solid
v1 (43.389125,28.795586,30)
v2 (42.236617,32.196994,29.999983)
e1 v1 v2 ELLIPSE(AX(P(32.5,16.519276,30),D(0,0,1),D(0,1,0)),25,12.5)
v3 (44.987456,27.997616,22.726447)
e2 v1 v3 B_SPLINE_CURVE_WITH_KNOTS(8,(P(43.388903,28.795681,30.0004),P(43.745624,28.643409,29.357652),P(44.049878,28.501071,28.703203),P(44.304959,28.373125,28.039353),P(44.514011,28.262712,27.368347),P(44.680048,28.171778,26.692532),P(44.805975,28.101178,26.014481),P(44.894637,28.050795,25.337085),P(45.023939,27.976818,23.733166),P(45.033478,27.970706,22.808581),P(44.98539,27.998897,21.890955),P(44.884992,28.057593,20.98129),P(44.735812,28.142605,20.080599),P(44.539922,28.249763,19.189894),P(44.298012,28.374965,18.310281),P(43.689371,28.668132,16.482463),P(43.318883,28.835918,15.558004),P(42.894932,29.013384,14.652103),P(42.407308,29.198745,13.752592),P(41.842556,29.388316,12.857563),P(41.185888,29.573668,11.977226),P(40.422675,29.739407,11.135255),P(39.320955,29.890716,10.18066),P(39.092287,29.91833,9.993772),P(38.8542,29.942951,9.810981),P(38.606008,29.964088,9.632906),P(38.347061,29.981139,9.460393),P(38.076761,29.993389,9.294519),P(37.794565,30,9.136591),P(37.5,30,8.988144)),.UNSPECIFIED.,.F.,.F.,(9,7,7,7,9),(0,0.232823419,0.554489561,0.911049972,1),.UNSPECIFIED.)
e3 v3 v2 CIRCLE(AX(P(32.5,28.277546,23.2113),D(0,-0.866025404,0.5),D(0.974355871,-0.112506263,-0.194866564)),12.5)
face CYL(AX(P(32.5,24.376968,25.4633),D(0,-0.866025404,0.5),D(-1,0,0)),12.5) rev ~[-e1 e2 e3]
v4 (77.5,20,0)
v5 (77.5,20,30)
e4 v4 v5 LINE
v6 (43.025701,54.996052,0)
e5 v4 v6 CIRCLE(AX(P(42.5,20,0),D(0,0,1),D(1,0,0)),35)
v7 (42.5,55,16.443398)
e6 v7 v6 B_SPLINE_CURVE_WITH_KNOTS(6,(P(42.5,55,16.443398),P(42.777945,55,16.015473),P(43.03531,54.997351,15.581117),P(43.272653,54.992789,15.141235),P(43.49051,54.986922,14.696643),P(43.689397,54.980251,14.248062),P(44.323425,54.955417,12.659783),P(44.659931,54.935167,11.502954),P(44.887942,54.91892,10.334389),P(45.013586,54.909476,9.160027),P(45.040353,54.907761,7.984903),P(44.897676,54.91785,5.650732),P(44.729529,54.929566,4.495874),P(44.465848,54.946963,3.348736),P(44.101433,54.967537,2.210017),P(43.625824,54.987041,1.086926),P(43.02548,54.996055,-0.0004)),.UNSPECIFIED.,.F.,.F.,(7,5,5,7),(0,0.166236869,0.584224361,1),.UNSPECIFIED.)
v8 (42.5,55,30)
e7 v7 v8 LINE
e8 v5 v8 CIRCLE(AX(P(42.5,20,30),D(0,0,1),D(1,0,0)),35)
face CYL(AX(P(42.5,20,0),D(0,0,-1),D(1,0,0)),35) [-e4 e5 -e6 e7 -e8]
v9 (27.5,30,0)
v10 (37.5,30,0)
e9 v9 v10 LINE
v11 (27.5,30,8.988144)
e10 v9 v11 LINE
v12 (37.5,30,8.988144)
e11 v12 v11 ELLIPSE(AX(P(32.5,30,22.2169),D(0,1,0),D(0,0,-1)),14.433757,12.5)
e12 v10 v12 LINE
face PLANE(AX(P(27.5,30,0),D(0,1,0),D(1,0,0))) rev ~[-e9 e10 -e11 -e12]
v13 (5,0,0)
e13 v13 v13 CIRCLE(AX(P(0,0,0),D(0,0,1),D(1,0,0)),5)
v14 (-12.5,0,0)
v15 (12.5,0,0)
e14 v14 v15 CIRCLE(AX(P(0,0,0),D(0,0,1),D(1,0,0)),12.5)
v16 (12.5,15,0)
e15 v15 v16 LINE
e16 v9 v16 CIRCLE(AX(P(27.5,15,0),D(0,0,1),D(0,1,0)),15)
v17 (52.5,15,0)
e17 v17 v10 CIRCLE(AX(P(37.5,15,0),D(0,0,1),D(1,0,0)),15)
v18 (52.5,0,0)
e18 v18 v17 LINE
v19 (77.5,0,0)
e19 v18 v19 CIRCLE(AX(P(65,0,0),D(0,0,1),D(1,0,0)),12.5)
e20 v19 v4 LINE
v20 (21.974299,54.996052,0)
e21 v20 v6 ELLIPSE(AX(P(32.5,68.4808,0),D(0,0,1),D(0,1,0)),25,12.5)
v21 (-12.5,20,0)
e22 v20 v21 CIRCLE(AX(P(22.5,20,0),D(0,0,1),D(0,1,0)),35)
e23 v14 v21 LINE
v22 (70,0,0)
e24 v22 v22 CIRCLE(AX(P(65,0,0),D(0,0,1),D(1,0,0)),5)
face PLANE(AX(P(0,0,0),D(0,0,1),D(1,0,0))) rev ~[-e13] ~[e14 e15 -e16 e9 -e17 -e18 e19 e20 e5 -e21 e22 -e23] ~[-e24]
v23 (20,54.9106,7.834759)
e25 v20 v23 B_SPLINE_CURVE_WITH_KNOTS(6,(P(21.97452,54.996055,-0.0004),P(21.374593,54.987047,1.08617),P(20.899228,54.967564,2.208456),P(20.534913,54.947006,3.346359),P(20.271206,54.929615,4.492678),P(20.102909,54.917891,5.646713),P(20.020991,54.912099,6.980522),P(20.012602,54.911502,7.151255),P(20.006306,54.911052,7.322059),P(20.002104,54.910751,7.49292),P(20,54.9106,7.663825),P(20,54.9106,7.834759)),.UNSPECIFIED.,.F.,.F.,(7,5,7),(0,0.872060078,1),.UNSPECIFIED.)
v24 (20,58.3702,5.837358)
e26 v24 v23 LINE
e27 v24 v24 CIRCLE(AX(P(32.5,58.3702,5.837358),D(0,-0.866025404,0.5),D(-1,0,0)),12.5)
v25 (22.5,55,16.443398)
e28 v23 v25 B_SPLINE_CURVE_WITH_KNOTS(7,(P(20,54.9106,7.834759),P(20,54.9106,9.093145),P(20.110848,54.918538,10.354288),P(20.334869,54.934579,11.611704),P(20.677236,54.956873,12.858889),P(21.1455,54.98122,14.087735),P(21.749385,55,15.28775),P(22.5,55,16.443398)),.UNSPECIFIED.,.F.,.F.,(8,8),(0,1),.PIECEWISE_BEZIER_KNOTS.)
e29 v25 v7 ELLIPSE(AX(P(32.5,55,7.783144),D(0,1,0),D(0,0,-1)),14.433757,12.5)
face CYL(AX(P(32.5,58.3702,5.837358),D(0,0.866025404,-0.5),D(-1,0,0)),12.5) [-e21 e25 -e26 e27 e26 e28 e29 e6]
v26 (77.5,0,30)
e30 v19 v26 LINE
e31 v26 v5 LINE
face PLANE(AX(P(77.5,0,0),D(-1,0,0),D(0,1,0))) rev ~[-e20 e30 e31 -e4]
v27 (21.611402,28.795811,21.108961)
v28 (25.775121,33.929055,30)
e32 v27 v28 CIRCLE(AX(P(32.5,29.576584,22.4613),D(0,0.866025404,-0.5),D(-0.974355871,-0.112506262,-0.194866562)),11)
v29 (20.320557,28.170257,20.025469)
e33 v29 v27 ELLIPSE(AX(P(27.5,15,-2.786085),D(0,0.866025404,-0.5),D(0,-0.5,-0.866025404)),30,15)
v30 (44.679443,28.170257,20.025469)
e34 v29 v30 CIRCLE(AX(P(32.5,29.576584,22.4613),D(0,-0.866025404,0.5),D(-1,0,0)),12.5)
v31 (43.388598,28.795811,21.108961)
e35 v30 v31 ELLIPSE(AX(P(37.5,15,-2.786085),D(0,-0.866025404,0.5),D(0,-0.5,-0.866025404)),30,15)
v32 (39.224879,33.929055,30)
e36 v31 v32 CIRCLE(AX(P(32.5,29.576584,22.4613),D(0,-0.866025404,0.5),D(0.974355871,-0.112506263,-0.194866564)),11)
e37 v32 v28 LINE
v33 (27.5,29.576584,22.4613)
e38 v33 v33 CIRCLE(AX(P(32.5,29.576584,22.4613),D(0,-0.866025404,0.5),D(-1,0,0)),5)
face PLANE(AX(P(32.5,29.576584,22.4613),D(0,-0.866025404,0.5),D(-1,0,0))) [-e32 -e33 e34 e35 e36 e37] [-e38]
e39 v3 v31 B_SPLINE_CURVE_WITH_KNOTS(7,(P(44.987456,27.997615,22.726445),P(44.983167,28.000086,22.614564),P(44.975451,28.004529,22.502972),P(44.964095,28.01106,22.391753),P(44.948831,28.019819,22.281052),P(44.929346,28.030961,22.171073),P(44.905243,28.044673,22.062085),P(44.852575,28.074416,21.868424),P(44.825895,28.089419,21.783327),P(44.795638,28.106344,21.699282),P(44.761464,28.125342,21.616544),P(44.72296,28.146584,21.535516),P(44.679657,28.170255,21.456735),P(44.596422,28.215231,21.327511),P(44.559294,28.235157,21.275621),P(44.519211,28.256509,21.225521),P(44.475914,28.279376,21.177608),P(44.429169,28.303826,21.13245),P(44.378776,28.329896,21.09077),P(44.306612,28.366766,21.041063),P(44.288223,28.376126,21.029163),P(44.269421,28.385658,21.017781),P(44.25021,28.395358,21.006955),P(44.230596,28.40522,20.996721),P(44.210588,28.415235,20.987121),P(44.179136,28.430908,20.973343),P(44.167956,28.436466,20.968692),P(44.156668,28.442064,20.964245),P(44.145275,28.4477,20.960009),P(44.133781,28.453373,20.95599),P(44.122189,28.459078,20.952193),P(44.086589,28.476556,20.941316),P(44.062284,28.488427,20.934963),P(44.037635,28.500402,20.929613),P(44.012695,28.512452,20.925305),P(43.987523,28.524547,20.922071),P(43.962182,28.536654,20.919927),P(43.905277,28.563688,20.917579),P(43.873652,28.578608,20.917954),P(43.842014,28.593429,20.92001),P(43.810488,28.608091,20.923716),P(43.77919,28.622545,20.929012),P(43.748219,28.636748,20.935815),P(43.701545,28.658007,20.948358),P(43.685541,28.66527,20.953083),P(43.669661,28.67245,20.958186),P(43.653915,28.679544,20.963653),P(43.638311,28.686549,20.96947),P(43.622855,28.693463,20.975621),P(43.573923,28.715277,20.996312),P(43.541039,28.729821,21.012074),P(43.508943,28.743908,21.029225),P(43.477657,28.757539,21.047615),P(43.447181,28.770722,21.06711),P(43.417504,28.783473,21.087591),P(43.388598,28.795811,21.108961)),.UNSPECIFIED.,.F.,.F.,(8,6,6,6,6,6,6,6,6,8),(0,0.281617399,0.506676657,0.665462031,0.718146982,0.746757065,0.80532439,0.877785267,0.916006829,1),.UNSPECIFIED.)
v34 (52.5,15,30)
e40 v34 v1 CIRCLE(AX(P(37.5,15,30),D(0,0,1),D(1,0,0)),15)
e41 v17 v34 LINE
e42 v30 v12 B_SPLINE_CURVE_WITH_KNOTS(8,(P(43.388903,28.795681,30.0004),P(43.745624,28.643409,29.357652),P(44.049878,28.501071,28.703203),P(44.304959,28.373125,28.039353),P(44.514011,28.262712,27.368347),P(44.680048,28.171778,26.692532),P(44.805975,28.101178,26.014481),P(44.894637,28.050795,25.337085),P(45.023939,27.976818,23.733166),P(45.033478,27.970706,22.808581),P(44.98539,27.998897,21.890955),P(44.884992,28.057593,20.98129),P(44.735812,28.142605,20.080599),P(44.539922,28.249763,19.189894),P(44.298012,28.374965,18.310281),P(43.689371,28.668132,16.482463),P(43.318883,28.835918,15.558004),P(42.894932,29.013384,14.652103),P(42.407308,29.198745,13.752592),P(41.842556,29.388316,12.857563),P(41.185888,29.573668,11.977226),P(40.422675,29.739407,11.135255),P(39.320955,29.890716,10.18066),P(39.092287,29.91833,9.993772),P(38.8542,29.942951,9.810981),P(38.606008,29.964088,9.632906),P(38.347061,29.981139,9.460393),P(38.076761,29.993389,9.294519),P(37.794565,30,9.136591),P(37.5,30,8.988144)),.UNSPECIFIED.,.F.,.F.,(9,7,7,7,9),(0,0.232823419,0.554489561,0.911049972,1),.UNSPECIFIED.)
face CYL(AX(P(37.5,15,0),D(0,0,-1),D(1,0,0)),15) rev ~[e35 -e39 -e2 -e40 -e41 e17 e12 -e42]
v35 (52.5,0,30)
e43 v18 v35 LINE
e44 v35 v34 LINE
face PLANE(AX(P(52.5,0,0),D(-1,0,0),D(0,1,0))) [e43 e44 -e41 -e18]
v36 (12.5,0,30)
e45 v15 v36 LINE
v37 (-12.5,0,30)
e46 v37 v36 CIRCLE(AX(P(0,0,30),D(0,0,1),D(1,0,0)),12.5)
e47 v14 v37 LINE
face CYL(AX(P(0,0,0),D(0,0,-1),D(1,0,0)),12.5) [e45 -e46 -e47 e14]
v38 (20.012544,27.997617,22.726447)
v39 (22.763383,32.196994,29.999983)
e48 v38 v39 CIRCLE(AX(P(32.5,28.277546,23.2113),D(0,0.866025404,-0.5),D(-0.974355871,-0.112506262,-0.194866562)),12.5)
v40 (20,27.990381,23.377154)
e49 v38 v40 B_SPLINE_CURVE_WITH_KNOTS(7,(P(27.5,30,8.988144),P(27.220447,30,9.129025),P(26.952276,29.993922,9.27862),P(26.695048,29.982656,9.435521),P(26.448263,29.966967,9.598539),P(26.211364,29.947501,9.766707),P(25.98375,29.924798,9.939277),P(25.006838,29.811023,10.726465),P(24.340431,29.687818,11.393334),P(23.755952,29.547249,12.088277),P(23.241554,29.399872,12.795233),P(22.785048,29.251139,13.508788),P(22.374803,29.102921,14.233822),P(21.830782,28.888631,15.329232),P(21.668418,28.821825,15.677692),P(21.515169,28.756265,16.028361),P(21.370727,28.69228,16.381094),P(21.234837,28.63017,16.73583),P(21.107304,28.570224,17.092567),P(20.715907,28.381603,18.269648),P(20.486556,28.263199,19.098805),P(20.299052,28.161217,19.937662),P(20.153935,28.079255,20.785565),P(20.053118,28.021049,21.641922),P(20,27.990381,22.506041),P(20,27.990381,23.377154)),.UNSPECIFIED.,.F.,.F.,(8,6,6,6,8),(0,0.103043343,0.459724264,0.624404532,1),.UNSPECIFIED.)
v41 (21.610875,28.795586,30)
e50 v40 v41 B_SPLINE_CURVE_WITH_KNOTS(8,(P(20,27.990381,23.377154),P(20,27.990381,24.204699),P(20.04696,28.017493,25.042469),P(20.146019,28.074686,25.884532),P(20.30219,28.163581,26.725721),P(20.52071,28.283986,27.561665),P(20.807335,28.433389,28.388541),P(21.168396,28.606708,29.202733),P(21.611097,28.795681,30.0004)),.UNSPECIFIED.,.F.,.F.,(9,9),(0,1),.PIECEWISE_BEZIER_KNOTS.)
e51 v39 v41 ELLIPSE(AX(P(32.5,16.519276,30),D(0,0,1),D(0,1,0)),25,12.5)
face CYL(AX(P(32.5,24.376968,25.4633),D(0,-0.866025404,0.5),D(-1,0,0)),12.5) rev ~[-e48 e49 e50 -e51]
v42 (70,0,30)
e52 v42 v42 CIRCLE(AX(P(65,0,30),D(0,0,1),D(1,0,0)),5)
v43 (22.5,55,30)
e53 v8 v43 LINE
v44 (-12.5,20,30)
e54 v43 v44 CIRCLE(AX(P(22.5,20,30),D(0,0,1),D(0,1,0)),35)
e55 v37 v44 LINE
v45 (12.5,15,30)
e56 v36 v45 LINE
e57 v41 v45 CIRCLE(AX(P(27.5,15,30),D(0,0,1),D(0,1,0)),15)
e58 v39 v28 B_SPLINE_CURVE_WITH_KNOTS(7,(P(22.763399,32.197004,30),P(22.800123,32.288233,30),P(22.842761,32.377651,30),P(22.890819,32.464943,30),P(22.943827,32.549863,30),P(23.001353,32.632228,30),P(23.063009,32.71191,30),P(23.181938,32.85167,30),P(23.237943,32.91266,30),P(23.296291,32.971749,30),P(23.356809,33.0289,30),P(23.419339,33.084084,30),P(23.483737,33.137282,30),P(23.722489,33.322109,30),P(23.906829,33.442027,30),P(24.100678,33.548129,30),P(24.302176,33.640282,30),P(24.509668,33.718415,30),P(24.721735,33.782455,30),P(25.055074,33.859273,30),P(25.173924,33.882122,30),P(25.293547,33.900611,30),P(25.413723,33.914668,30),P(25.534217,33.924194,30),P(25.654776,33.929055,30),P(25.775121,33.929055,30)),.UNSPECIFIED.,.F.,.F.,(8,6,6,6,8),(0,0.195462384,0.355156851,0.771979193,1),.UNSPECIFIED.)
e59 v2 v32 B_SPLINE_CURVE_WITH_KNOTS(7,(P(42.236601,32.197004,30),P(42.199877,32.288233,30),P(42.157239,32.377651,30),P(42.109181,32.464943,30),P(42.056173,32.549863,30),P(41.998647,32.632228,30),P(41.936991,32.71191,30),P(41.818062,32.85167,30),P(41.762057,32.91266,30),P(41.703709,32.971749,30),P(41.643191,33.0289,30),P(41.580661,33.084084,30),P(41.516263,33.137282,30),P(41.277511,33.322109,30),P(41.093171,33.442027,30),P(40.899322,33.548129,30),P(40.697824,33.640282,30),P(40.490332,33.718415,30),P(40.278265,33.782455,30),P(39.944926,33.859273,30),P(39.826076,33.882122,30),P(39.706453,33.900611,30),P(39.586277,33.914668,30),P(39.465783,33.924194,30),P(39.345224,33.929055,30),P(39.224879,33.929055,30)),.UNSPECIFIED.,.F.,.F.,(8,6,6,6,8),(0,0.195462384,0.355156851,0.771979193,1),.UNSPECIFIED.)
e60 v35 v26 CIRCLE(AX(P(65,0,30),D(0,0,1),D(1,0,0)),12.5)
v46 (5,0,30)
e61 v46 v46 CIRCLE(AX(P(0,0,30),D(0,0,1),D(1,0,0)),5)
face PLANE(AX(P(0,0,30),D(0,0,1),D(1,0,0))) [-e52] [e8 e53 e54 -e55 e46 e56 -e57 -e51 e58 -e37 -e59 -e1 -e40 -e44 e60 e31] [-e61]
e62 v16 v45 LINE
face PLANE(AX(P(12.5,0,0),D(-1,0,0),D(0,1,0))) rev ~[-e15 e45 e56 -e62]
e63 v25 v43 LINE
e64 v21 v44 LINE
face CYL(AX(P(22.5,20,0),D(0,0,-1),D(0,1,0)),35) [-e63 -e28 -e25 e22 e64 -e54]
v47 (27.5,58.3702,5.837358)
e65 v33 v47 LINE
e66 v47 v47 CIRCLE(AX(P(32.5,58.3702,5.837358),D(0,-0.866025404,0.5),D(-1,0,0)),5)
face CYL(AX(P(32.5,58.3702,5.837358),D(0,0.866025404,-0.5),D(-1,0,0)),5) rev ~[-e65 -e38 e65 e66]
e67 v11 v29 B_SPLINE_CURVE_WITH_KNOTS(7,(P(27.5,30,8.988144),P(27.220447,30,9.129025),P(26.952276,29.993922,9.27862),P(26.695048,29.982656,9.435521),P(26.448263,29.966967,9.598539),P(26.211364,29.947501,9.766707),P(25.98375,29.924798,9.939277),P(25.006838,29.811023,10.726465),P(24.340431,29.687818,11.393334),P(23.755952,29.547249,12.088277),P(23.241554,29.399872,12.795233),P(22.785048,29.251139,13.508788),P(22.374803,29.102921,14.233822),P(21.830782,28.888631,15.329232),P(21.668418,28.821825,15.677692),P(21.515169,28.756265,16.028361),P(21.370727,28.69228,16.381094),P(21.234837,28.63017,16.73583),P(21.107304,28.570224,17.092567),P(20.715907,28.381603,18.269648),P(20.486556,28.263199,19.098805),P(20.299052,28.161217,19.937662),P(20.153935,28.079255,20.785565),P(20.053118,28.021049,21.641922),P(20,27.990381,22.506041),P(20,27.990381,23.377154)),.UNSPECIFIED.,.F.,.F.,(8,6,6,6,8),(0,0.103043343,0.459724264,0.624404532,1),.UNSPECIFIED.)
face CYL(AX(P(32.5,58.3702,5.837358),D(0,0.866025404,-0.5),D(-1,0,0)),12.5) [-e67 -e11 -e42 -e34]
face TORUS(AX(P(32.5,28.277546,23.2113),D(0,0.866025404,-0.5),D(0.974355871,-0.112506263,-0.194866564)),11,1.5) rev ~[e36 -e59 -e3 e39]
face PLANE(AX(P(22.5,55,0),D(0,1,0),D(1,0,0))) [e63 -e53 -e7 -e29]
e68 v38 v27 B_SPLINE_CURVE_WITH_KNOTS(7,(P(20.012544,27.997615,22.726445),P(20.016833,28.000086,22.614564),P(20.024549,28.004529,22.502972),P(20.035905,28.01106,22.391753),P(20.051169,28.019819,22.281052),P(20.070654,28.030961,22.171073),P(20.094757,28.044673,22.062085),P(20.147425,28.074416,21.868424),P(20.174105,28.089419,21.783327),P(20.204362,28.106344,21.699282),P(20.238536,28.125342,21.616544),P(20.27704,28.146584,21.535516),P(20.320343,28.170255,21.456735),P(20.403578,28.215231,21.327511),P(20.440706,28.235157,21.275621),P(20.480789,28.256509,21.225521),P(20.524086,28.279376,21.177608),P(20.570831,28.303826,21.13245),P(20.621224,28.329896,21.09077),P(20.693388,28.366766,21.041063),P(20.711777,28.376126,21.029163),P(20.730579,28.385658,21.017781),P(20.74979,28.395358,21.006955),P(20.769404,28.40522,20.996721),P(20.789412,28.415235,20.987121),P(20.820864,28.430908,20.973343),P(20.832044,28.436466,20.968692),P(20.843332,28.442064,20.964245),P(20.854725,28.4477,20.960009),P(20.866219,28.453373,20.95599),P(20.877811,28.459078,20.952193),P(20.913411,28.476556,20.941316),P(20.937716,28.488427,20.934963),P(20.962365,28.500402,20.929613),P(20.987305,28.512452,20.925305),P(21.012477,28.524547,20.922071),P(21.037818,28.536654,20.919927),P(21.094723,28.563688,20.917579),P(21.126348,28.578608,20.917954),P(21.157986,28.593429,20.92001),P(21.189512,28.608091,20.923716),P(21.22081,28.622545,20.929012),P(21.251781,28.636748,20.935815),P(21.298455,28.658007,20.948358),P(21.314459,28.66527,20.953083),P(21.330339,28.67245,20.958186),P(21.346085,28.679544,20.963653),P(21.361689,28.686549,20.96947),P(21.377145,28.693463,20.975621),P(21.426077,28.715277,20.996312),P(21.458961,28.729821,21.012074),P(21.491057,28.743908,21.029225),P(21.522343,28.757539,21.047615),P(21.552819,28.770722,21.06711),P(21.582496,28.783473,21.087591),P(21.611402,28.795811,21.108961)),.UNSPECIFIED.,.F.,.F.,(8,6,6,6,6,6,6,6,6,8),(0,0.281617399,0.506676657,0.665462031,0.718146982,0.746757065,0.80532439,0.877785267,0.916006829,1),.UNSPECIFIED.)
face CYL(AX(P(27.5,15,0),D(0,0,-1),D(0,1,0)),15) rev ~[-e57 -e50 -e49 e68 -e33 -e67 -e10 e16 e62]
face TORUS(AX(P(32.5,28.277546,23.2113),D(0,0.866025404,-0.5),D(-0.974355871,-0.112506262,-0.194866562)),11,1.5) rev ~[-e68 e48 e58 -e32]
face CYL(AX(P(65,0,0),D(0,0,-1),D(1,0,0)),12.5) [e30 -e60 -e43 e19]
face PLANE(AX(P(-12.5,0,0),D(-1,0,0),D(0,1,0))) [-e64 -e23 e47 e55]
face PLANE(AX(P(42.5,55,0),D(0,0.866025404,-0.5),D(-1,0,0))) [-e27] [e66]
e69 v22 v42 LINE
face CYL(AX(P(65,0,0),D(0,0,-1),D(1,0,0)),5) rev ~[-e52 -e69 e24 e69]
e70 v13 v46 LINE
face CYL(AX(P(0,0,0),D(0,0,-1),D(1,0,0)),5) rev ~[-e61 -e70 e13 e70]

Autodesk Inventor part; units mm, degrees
ref_plane "YZ Plane" through (0, 0, 0) normal (1, 0, 0) x (0, 1, 0)
ref_plane "XZ Plane" through (0, 0, 0) normal (0, 1, 0) x (-1, 0, 0)
sketch "Sketch1" plane through (0, 0, 0) normal (0, 0, 1) x (1, 0, 0)
  circle A0 centre (0, 0) radius 5
  circle A1 centre (65, 0) radius 5
  circle A2 centre (0, 0) radius 12.5
  circle A3 centre (65, 0) radius 12.5
  line L0 (22.5, 9.5) -> (42.5, 9.5)
  line L1 (42.5, 9.5) -> (42.5, -10.5)
  line L2 (42.5, -10.5) -> (22.5, -10.5)
  line L3 (22.5, -10.5) -> (22.5, 9.5)
  line L4 (0, 0) -> (65, 0) construction
  line L5 (32.5, 0) -> (32.5, 30) construction
  line L6 (27.5, 30) -> (37.5, 30)
  line L7 (12.5, 0) -> (12.5, 15)
  line L8 (52.5, 0) -> (52.5, 15)
  arc A4 (27.5, 30) -> (12.5, 15) centre (27.5, 15) ccw
  arc A5 (52.5, 15) -> (37.5, 30) centre (37.5, 15) ccw
  line L9 (-12.5, 0) -> (-12.5, 20)
  line L10 (77.5, 0) -> (77.5, 20)
  line L11 (22.5, 55) -> (42.5, 55)
  arc A6 (22.5, 55) -> (-12.5, 20) centre (22.5, 20) ccw
  arc A7 (77.5, 20) -> (42.5, 55) centre (42.5, 20) ccw
  point P0 (22.5, 30)
  point P1 (42.5, 30)
  dimension "d0" = 10
  dimension "d1" = 10
  dimension "d2" = 65
  dimension "d3" = 25
  dimension "d4" = 25
  dimension "d5" = 22.5
  dimension "d6" = 22.5
  dimension "d7" = 9.5
  dimension "d8" = 10.5
  dimension "d11" = 20
  dimension "d12" = 10
  dimension "d13" = 30
  dimension "d14" = 15
  dimension "d15" = 55
  dimension "d16" = 35
extrude "Extrusion1" add sketch "Sketch1" along normal blind 30 contours A2 | A2 L9 A6 L11 A7 L10 A3 L8 A5 L6 A4 L7 | A3
ref_plane "Work Plane1" through (42.5, 55, 0) normal (0, 0.8660254, -0.5) x (-1, 0, 0)
sketch "Sketch2" plane through (42.5, 55, 0) normal (0, 0.8660254, -0.5) x (-1, 0, 0)
  line L0 (0, 0) -> (20, 0) projected
  line L1 (20, 0) -> (20, 25.9808) projected
  line L2 (0, 25.9808) -> (20, 25.9808) projected
  line L3 (0, 0) -> (0, 25.9808) projected
  line L4 (15, -12.5) -> (5, -12.5) projected
  line L5 (5, -12.5) -> (5, 13.4808) projected
  line L6 (15, 13.4808) -> (5, 13.4808) projected
  line L7 (15, -12.5) -> (15, 13.4808) projected
  circle A0 centre (10, 6.7404) radius 5
  circle A1 centre (10, 6.7404) radius 12.5
  point P0 (42.5, -27.5)
  dimension "d20" = 38.4808
  dimension "d21" = 19.2404
  dimension "d22" = 20
  dimension "d23" = 10
  dimension "d24" = 10
  dimension "d25" = 25
extrude "Extrusion6" cut sketch "Sketch2" against normal blind 55.75 contours A0
extrude "Extrusion7" add sketch "Sketch2" against normal blind 39.25 contours L3 A1 L1 L0 L7 L6 L5 | L0 L5 A1 L3 | L5 A0 L7 L0 | L0 L7 A1 L5 | L0 L1 A1 L7 | L5 L6 L7 A0
sketch "Sketch5" plane through (32.5, 24.3787, 25.4623) normal (0, -0.8660254, 0.5) x (-1, 0, 0)
  circle A0 centre (0, 0) radius 5 projected
  circle A1 centre (0, 0) radius 12.5 projected
  point P0 (32.5, 34.2404)
extrude "Extrusion8" cut sketch "Sketch5" against normal blind 6
sketch "Sketch6" plane through (22.5, 55, 30) normal (0, 1, 0) x (1, 0, 0)
  ellipse E0 centre (10, 7.5377) end of major axis (22.5, 7.5377) minor radius 10.8253 (1.0281, 0) -> (18.9719, 0) ccw projected
  line L0 (1.0281, 0) -> (18.9719, 0) projected
  point P0 (-22.5, 30)
extrude "Extrusion9" cut sketch "Sketch6" against normal blind 41
fillet "Fillet3" radius 1.5 2 edges at (20.4586, 31.2539, 25.3665) (44.5414, 31.2539, 25.3665)
equation "\"d12\" = 0.5 * d11"
equation "\"d15\" = d13 + d3"
equation "\"d21\" = 0.5 * d20"
equation "\"d23\" = 0.5 * d22"
properties part number "Mount"
